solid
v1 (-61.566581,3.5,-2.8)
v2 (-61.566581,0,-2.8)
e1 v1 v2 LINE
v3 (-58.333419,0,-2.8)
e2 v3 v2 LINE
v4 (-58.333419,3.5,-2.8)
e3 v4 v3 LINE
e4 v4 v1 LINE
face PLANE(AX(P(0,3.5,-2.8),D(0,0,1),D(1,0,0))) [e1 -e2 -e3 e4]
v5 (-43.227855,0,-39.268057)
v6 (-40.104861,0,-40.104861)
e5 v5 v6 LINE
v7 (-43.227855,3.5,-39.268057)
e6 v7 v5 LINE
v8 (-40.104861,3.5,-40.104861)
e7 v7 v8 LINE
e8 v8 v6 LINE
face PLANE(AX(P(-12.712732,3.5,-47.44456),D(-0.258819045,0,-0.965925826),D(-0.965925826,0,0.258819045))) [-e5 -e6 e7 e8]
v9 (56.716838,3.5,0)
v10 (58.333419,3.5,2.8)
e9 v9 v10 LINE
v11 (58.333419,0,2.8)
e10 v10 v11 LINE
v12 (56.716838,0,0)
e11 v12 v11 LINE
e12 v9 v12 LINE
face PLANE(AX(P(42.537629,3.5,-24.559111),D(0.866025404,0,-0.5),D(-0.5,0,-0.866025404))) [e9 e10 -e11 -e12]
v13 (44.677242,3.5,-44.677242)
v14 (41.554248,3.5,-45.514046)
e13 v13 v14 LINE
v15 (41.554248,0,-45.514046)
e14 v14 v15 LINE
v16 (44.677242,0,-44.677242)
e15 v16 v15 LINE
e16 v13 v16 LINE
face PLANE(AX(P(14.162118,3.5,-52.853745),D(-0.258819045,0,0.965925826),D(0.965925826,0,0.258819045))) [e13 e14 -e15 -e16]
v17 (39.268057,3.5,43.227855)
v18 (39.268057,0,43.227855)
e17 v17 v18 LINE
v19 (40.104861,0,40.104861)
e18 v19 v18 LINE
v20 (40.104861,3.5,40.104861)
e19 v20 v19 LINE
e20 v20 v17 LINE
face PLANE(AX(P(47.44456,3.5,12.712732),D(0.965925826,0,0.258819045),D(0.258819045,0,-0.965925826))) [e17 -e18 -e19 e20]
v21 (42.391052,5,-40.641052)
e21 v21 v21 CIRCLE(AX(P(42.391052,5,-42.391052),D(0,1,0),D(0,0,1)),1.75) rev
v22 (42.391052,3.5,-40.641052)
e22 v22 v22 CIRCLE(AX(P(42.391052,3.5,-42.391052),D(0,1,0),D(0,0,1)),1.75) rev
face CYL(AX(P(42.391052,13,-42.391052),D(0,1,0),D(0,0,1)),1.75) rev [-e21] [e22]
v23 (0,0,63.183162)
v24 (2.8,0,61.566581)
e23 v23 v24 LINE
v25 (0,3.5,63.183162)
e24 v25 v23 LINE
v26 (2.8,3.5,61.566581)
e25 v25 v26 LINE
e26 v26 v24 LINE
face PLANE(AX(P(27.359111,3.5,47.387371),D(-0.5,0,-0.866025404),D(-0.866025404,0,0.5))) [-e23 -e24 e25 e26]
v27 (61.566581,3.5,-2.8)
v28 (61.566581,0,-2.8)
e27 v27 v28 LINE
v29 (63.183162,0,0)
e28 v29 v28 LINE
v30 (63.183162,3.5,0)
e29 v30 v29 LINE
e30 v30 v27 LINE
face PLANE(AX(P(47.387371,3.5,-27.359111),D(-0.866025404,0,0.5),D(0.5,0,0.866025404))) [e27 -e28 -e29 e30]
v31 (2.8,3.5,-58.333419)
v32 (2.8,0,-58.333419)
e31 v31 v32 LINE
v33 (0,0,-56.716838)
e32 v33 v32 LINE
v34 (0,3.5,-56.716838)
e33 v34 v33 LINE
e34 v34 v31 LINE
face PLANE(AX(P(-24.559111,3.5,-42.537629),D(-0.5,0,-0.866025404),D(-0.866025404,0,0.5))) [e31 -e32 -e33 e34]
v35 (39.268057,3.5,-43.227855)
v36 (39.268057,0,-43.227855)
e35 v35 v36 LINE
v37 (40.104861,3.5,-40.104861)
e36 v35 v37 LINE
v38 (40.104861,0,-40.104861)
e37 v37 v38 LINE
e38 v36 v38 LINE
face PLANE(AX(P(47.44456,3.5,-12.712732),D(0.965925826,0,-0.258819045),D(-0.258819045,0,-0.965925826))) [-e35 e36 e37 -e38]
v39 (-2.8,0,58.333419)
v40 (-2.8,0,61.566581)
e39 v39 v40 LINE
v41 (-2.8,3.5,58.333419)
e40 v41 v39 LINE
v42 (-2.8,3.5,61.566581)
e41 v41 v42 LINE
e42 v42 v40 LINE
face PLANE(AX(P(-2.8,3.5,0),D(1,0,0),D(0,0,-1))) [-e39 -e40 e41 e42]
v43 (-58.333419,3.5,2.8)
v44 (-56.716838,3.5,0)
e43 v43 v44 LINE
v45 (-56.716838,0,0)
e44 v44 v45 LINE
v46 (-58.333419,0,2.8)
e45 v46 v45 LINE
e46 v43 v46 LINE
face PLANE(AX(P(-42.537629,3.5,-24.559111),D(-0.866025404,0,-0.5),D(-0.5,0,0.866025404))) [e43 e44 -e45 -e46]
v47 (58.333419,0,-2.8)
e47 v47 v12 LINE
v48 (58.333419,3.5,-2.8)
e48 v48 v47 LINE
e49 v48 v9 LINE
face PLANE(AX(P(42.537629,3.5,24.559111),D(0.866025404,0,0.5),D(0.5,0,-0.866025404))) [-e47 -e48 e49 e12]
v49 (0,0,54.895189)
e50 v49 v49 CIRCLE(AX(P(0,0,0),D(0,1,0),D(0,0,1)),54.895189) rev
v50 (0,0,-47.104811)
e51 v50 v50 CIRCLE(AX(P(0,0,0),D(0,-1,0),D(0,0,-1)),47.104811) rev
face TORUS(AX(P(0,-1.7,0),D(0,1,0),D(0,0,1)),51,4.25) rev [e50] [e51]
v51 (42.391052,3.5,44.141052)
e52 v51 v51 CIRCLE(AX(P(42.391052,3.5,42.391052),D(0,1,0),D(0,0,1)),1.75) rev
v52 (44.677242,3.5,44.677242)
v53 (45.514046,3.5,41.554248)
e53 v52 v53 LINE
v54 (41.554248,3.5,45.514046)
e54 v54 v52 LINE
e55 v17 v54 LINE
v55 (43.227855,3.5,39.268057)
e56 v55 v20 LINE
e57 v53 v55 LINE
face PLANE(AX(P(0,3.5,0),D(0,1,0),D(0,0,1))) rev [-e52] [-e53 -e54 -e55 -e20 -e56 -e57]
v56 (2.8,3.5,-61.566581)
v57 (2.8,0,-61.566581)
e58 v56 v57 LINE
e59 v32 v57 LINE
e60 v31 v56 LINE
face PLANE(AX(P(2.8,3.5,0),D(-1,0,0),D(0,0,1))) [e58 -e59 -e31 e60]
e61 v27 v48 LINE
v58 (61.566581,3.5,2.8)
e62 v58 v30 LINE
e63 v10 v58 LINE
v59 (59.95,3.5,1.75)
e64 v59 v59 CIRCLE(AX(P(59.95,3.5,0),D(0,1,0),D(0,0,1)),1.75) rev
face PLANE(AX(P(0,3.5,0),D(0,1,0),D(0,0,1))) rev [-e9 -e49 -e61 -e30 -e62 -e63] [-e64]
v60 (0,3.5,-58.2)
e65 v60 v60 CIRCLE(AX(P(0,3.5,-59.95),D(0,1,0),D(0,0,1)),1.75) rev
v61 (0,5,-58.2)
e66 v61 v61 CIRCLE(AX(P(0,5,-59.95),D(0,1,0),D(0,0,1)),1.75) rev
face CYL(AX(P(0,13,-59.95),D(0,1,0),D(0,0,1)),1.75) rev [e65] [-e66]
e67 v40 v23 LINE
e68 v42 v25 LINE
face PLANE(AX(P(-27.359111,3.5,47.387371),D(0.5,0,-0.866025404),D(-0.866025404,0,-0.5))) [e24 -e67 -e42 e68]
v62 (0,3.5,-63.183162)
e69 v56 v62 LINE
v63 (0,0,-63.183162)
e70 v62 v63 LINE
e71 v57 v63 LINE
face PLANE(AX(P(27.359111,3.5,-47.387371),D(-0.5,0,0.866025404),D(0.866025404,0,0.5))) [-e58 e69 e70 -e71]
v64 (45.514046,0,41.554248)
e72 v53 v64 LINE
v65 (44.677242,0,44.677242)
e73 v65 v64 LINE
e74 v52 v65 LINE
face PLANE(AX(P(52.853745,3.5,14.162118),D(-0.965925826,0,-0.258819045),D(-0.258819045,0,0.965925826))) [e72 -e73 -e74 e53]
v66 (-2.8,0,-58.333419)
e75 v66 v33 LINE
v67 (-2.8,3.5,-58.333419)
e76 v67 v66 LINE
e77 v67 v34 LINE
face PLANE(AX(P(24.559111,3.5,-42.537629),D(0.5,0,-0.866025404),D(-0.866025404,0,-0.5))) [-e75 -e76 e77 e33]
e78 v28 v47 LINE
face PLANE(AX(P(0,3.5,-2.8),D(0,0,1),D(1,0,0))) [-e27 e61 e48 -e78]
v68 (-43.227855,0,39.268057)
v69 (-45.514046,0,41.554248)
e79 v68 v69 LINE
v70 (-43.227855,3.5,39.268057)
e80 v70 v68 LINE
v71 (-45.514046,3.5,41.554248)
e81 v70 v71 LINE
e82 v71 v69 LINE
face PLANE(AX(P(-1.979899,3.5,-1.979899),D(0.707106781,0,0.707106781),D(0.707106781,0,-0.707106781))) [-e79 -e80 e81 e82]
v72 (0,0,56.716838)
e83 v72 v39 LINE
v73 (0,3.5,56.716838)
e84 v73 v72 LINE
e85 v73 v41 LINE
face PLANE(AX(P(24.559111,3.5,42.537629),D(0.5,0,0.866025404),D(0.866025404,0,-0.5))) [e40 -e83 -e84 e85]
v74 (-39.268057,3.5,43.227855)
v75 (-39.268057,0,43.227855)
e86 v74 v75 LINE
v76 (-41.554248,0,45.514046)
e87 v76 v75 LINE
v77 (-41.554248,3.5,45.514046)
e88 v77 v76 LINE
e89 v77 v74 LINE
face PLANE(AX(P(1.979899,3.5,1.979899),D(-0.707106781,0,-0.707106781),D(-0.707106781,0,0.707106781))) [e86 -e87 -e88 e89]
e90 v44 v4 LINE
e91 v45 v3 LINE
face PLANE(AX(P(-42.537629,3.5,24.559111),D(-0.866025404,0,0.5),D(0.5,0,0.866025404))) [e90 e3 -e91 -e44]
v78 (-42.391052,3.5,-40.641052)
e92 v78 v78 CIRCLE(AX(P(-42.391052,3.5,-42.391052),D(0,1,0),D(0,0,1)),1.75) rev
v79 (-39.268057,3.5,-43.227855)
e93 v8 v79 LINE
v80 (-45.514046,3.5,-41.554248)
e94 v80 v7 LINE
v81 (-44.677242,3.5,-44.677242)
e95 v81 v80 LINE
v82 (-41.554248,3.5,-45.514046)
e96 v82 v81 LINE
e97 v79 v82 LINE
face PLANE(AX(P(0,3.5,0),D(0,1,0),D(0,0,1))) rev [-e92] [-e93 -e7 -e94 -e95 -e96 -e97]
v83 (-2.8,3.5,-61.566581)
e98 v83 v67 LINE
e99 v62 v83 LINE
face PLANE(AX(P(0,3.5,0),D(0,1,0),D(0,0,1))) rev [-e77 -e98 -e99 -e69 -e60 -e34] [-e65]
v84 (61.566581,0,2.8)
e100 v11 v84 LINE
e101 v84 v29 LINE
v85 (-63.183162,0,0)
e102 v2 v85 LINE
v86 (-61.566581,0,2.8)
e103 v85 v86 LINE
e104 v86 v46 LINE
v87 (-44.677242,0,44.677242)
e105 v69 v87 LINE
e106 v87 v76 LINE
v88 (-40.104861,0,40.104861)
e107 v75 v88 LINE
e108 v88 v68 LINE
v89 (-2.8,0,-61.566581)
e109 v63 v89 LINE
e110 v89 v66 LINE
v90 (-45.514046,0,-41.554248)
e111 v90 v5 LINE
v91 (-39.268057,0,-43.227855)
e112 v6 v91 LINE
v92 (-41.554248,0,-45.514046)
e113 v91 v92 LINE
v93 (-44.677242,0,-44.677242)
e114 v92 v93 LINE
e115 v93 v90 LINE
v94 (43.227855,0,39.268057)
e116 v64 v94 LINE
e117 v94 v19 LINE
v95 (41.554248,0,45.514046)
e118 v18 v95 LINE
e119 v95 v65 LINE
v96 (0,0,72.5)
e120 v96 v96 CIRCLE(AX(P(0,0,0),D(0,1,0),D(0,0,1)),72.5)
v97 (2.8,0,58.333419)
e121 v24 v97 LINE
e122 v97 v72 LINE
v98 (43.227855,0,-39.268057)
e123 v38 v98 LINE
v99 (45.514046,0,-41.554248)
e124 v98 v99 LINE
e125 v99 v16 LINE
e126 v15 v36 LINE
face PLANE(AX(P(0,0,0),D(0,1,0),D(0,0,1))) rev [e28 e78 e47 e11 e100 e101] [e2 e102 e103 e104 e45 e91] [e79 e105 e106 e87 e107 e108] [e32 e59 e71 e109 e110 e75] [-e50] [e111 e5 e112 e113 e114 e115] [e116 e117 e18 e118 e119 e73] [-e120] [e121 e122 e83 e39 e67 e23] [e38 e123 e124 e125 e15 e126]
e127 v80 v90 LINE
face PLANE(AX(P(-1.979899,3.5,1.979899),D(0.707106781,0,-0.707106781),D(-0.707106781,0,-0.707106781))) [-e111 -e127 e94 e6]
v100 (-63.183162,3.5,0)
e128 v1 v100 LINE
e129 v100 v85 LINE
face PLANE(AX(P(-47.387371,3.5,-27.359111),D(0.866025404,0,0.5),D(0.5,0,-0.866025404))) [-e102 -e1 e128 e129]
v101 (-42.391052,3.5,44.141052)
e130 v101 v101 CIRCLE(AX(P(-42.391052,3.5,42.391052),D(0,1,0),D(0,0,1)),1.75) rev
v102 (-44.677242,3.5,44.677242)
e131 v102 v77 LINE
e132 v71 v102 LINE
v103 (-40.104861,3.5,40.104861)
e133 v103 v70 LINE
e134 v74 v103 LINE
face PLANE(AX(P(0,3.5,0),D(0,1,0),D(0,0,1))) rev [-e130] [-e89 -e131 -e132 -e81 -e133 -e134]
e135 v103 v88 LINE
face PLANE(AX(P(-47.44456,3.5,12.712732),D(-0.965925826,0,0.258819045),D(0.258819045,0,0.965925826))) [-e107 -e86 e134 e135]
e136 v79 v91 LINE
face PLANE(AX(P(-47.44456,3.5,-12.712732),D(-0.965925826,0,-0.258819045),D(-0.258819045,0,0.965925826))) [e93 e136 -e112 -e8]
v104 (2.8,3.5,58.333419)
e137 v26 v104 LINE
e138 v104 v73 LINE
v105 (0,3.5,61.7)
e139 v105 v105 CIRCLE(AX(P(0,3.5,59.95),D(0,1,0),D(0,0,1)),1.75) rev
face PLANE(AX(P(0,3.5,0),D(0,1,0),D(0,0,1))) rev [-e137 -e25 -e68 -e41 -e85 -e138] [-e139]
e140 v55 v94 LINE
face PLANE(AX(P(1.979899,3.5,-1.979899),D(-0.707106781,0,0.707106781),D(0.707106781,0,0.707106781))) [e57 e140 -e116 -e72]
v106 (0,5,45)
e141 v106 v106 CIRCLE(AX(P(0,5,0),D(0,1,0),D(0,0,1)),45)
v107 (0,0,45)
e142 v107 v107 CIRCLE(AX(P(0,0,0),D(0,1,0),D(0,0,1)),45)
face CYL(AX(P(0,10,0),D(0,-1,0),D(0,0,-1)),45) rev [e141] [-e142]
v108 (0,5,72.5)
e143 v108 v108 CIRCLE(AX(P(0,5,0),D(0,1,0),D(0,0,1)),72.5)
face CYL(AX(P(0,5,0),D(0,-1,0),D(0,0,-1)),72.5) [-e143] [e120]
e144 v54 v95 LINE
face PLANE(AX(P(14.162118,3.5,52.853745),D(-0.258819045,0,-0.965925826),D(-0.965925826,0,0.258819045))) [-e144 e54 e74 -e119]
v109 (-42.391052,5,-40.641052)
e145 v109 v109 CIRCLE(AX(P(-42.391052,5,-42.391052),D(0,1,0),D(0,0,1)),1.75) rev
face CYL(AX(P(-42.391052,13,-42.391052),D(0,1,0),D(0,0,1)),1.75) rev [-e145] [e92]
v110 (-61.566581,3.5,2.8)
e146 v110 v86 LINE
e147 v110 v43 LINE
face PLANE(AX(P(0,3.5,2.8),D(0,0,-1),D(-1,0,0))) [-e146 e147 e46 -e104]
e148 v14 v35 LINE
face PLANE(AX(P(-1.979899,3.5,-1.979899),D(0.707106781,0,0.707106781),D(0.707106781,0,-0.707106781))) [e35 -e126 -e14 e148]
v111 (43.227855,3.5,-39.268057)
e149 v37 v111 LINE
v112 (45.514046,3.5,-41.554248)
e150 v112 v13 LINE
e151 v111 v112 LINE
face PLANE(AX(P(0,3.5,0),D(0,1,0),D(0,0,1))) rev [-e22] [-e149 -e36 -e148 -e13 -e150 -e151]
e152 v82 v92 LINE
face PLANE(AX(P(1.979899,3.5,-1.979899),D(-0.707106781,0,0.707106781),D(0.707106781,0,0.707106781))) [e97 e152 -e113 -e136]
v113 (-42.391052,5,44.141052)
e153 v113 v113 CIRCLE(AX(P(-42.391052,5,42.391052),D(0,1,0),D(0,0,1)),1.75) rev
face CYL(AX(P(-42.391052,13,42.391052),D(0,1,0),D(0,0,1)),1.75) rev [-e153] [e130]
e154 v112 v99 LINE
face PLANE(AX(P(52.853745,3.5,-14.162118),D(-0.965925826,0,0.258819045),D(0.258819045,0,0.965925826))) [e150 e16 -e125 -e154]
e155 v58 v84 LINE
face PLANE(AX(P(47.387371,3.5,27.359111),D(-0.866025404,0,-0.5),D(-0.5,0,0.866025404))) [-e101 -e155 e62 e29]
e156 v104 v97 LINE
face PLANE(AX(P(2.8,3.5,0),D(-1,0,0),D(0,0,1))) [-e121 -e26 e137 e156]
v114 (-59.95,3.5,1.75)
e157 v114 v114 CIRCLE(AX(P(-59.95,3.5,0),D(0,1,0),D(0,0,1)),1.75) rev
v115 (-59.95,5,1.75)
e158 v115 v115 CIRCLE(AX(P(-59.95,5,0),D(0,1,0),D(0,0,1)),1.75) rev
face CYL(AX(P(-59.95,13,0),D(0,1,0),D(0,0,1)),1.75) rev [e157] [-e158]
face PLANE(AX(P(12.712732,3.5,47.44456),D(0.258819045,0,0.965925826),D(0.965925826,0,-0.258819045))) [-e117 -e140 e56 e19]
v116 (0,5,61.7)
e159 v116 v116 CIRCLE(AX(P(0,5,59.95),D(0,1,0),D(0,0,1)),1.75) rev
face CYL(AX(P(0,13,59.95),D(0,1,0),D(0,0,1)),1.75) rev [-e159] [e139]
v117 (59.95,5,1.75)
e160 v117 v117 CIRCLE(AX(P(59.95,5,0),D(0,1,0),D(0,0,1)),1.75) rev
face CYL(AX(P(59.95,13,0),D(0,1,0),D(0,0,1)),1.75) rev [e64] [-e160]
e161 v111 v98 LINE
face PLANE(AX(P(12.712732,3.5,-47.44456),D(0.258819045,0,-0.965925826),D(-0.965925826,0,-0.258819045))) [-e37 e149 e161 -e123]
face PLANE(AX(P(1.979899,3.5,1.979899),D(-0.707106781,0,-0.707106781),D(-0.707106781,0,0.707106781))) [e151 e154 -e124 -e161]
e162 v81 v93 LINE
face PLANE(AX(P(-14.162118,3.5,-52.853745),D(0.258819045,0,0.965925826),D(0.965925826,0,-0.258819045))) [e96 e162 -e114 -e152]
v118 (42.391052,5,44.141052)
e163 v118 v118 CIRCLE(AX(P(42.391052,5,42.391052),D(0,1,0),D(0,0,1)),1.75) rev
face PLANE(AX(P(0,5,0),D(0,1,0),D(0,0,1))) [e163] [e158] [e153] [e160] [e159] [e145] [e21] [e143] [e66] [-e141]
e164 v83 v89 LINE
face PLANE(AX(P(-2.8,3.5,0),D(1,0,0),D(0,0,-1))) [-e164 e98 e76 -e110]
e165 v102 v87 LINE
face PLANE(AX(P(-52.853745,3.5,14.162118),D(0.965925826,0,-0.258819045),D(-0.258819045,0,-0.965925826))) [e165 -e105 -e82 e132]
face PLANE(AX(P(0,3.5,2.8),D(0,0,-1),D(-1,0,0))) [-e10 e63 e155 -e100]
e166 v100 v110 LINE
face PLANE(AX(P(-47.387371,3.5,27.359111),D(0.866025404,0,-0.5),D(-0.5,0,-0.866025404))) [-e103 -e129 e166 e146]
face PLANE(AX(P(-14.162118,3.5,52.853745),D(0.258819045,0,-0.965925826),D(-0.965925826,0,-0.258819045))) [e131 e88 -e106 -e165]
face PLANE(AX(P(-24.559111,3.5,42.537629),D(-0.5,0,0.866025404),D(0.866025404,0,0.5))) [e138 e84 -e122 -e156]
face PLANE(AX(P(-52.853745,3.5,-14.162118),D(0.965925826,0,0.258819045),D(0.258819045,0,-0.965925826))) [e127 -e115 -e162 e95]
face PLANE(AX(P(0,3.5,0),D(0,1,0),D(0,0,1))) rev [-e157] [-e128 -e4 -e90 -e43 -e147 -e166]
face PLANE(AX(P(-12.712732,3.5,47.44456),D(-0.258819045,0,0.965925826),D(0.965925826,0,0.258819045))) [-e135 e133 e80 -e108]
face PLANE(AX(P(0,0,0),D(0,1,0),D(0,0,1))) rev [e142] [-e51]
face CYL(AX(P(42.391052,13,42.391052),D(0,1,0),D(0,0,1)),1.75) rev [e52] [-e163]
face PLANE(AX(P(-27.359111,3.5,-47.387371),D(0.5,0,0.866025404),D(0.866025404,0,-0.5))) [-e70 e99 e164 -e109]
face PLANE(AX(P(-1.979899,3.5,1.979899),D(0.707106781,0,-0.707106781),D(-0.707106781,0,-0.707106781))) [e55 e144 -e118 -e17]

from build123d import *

# Parameters (mm, degrees)
SZKIC1_R                         = 72.5
DODANIE_WYCI_GNI_CIE1_DEPTH      = 5
DODANIE_WYCI_GNI_CIE2_START      = 5
SZKIC1_3_R                       = 65
SZKIC1_3_R_2                     = 54.5
DODANIE_WYCI_GNI_CIE2_DEPTH      = 8
DODANIE_WYCI_GNI_CIE3_START      = 13
SZKIC1_4_R                       = 54.5
DODANIE_WYCI_GNI_CIE3_DEPTH      = 30
DODANIE_WYCI_GNI_CIE4_START      = 43
SZKIC2_W                         = 34
SZKIC2_H                         = 88
DODANIE_WYCI_GNI_CIE4_DEPTH      = 93
SZKIC3_R                         = 45
WYTNIJ_WYCI_GNI_CIE1_DEPTH       = 10
DODANIE_WYCI_GNI_CIE5_START      = 10
SZKIC4_R                         = 3
DODANIE_WYCI_GNI_CIE5_DEPTH      = 13
ZAAWANSOWANYOTW_R1_OUTLINE_R     = 1.75
ZAAWANSOWANYOTW_R1_DEPTH         = 13
ZAAWANSOWANYOTW_R1_START         = 10
ZAAWANSOWANYOTW_R1_2_OUTLINE_R   = 3
ZAAWANSOWANYOTW_R1_2_OUTLINE_R_2 = 1.75
ZAAWANSOWANYOTW_R1_2_DEPTH       = 3
SZKIC7_R                         = 4.25
WYTNIJ_WYCI_GNI_CIE2_START       = -13
WYTNIJ_WYCI_GNI_CIE2_DEPTH       = 3.5
PRZECI_CIE1_START                = 5
PRZECI_CIE1_OUTLINE_R            = 1.75
PRZECI_CIE1_DEPTH                = 131
PRZECI_CIE1_START_2              = -3
PRZECI_CIE1_2_OUTLINE_R          = 3
PRZECI_CIE1_2_DEPTH              = 8


# Read off the part's stored shape, not the designer's step: ZaawansowanyOtwór1, Przecięcie1
with BuildPart() as part:
    # Szkic1 → Dodanie-wyciągnięcie1 (new body)
    with BuildSketch(Plane(origin=(0, 0, 0), x_dir=(1, 0, 0), z_dir=(0, 1, 0))):
        with Locations(Location((0, 0, 0), (0, 0, 270))):
            Circle(SZKIC1_R)
    extrude(amount=DODANIE_WYCI_GNI_CIE1_DEPTH)

    # Szkic1<3> → Dodanie-wyciągnięcie2 (add)
    with BuildSketch(Plane(origin=(0, 0, 0), x_dir=(1, 0, 0), z_dir=(0, 1, 0)).offset(DODANIE_WYCI_GNI_CIE2_START)):
        with Locations(Location((0, 0, 0), (0, 0, 270))):
            Circle(SZKIC1_3_R)
        Circle(SZKIC1_3_R_2)
    extrude(amount=DODANIE_WYCI_GNI_CIE2_DEPTH)

    # Szkic1<4> → Dodanie-wyciągnięcie3 (add)
    with BuildSketch(Plane(origin=(0, 0, 0), x_dir=(1, 0, 0), z_dir=(0, 1, 0)).offset(DODANIE_WYCI_GNI_CIE3_START)):
        with Locations(Location((0, 0, 0), (0, 0, 270))):
            Circle(SZKIC1_4_R)
    extrude(amount=DODANIE_WYCI_GNI_CIE3_DEPTH)

    # Szkic2 → Dodanie-wyciągnięcie4 (add)
    with BuildSketch(Plane(origin=(0, 0, 0), x_dir=(1, 0, 0), z_dir=(0, 1, 0)).offset(DODANIE_WYCI_GNI_CIE4_START)):
        with Locations((-44.5, -12.5)):
            Rectangle(SZKIC2_W, SZKIC2_H)
        with Locations((44.5, -12.5)):
            Rectangle(SZKIC2_W, SZKIC2_H)
    extrude(amount=DODANIE_WYCI_GNI_CIE4_DEPTH)

    # Szkic3 → Wytnij-wyciągnięcie1 (cut)
    with BuildSketch(Plane(origin=(0, 0, 0), x_dir=(1, 0, 0), z_dir=(0, 1, 0))):
        with Locations(Location((0, 0, 0), (0, 0, 270))):
            Circle(SZKIC3_R)
    extrude(amount=WYTNIJ_WYCI_GNI_CIE1_DEPTH, mode=Mode.SUBTRACT)

    # Szkic4 → Dodanie-wyciągnięcie5 (add)
    with BuildSketch(Plane(origin=(0, 0, 0), x_dir=(1, 0, 0), z_dir=(0, 1, 0)).offset(DODANIE_WYCI_GNI_CIE5_START)):
        with Locations(Location((0, 0, 0), (0, 0, 270))):
            Circle(SZKIC4_R)
    extrude(amount=-DODANIE_WYCI_GNI_CIE5_DEPTH)

    # ZaawansowanyOtwór1 outline → ZaawansowanyOtwór1 (cut)
    with BuildSketch(Plane(origin=(0, 0, 0), x_dir=(1, 0, 0), z_dir=(0, 1, 0))):
        with Locations((-42.391051532, 42.391051532)):
            Circle(ZAAWANSOWANYOTW_R1_OUTLINE_R)
        with Locations((-59.95, 0)):
            Circle(ZAAWANSOWANYOTW_R1_OUTLINE_R)
        with Locations((-42.391051532, -42.391051532)):
            Circle(ZAAWANSOWANYOTW_R1_OUTLINE_R)
        with Locations((0, -59.95)):
            Circle(ZAAWANSOWANYOTW_R1_OUTLINE_R)
        with Locations((42.391051532, -42.391051532)):
            Circle(ZAAWANSOWANYOTW_R1_OUTLINE_R)
        with Locations((59.95, 0)):
            Circle(ZAAWANSOWANYOTW_R1_OUTLINE_R)
        with Locations((42.391051532, 42.391051532)):
            Circle(ZAAWANSOWANYOTW_R1_OUTLINE_R)
        with Locations((0, 59.95)):
            Circle(ZAAWANSOWANYOTW_R1_OUTLINE_R)
    extrude(amount=ZAAWANSOWANYOTW_R1_DEPTH, mode=Mode.SUBTRACT)

    # ZaawansowanyOtw_r1 2 outline → ZaawansowanyOtw_r1 2 (cut)
    # profile 1 of 8: a face of its own
    with BuildSketch(Plane(origin=(0, 0, 0), x_dir=(1, 0, 0), z_dir=(0, 1, 0)).offset(ZAAWANSOWANYOTW_R1_START)):
        with Locations((-42.391051532, 42.391051532)):
            Circle(ZAAWANSOWANYOTW_R1_2_OUTLINE_R)
        with Locations((-42.391051532, 42.391051532)):
            Circle(ZAAWANSOWANYOTW_R1_2_OUTLINE_R_2, mode=Mode.SUBTRACT)
    # profile 2 of 8: a face of its own
    with BuildSketch(Plane(origin=(0, 0, 0), x_dir=(1, 0, 0), z_dir=(0, 1, 0)).offset(ZAAWANSOWANYOTW_R1_START)):
        with Locations((-59.95, 0)):
            Circle(ZAAWANSOWANYOTW_R1_2_OUTLINE_R)
        with Locations((-59.95, 0)):
            Circle(ZAAWANSOWANYOTW_R1_2_OUTLINE_R_2, mode=Mode.SUBTRACT)
    # profile 3 of 8: a face of its own
    with BuildSketch(Plane(origin=(0, 0, 0), x_dir=(1, 0, 0), z_dir=(0, 1, 0)).offset(ZAAWANSOWANYOTW_R1_START)):
        with Locations((-42.391051532, -42.391051532)):
            Circle(ZAAWANSOWANYOTW_R1_2_OUTLINE_R)
        with Locations((-42.391051532, -42.391051532)):
            Circle(ZAAWANSOWANYOTW_R1_2_OUTLINE_R_2, mode=Mode.SUBTRACT)
    # profile 4 of 8: a face of its own
    with BuildSketch(Plane(origin=(0, 0, 0), x_dir=(1, 0, 0), z_dir=(0, 1, 0)).offset(ZAAWANSOWANYOTW_R1_START)):
        with Locations((0, -59.95)):
            Circle(ZAAWANSOWANYOTW_R1_2_OUTLINE_R)
        with Locations((0, -59.95)):
            Circle(ZAAWANSOWANYOTW_R1_2_OUTLINE_R_2, mode=Mode.SUBTRACT)
    # profile 5 of 8: a face of its own
    with BuildSketch(Plane(origin=(0, 0, 0), x_dir=(1, 0, 0), z_dir=(0, 1, 0)).offset(ZAAWANSOWANYOTW_R1_START)):
        with Locations((42.391051532, -42.391051532)):
            Circle(ZAAWANSOWANYOTW_R1_2_OUTLINE_R)
        with Locations((42.391051532, -42.391051532)):
            Circle(ZAAWANSOWANYOTW_R1_2_OUTLINE_R_2, mode=Mode.SUBTRACT)
    # profile 6 of 8: a face of its own
    with BuildSketch(Plane(origin=(0, 0, 0), x_dir=(1, 0, 0), z_dir=(0, 1, 0)).offset(ZAAWANSOWANYOTW_R1_START)):
        with Locations((59.95, 0)):
            Circle(ZAAWANSOWANYOTW_R1_2_OUTLINE_R)
        with Locations((59.95, 0)):
            Circle(ZAAWANSOWANYOTW_R1_2_OUTLINE_R_2, mode=Mode.SUBTRACT)
    # profile 7 of 8: a face of its own
    with BuildSketch(Plane(origin=(0, 0, 0), x_dir=(1, 0, 0), z_dir=(0, 1, 0)).offset(ZAAWANSOWANYOTW_R1_START)):
        with Locations((42.391051532, 42.391051532)):
            Circle(ZAAWANSOWANYOTW_R1_2_OUTLINE_R)
        with Locations((42.391051532, 42.391051532)):
            Circle(ZAAWANSOWANYOTW_R1_2_OUTLINE_R_2, mode=Mode.SUBTRACT)
    # profile 8 of 8: a face of its own
    with BuildSketch(Plane(origin=(0, 0, 0), x_dir=(1, 0, 0), z_dir=(0, 1, 0)).offset(ZAAWANSOWANYOTW_R1_START)):
        with Locations((0, 59.95)):
            Circle(ZAAWANSOWANYOTW_R1_2_OUTLINE_R)
        with Locations((0, 59.95)):
            Circle(ZAAWANSOWANYOTW_R1_2_OUTLINE_R_2, mode=Mode.SUBTRACT)
    extrude(amount=ZAAWANSOWANYOTW_R1_2_DEPTH, mode=Mode.SUBTRACT)

    # Szkic7 → Wycięcie-obrót1 (revolve, cut)
    with BuildSketch(Plane(origin=(0, 0, 0), x_dir=(0, 0, -1), z_dir=(1, 0, 0)), mode=Mode.PRIVATE) as wyci_cie_obr_t1_sk:
        with Locations((51, -1.7)):
            Circle(SZKIC7_R)
    revolve(wyci_cie_obr_t1_sk.sketch.rotate(Axis((0, 0, 0), (0, -1, 0)), 305.308707607), axis=Axis((0, 0, 0), (0, -1, 0)), mode=Mode.SUBTRACT)

    # Szkic5 → Wytnij-wyciągnięcie2 (cut)
    with BuildSketch(Plane(origin=(0, 13, 0), x_dir=(1, 0, 0), z_dir=(0, 1, 0)).offset(WYTNIJ_WYCI_GNI_CIE2_START)):
        Polygon((43.227855306, 39.268057332), (45.514045733, 41.554247758), (44.677241959, 44.677241959), (41.554247758, 45.514045733), (39.268057332, 43.227855306), (40.104861106, 40.104861106), align=None)
        Polygon((-2.8, 61.566580754), (-2.8, 58.333419246), (0, 56.716838493), (2.8, 58.333419246), (2.8, 61.566580754), (0, 63.183161507), align=None)
        Polygon((58.333419246, -2.8), (61.566580754, -2.8), (63.183161507, 0), (61.566580754, 2.8), (58.333419246, 2.8), (56.716838493, 0), align=None)
        Polygon((39.268057332, -43.227855306), (41.554247758, -45.514045733), (44.677241959, -44.677241959), (45.514045733, -41.554247758), (43.227855306, -39.268057332), (40.104861106, -40.104861106), align=None)
        Polygon((-2.8, -58.333419246), (-2.8, -61.566580754), (0, -63.183161507), (2.8, -61.566580754), (2.8, -58.333419246), (0, -56.716838493), align=None)
        Polygon((-43.227855306, -39.268057332), (-45.514045733, -41.554247758), (-44.677241959, -44.677241959), (-41.554247758, -45.514045733), (-39.268057332, -43.227855306), (-40.104861106, -40.104861106), align=None)
        Polygon((-58.333419246, 2.8), (-61.566580754, 2.8), (-63.183161507, 0), (-61.566580754, -2.8), (-58.333419246, -2.8), (-56.716838493, 0), align=None)
        Polygon((-39.268057332, 43.227855306), (-41.554247758, 45.514045733), (-44.677241959, 44.677241959), (-45.514045733, 41.554247758), (-43.227855306, 39.268057332), (-40.104861106, 40.104861106), align=None)
    extrude(amount=WYTNIJ_WYCI_GNI_CIE2_DEPTH, mode=Mode.SUBTRACT)

    # Przecięcie1 outline → Przecięcie1 (cut)
    with BuildSketch(Plane(origin=(0, 0, 0), x_dir=(1, 0, 0), z_dir=(0, 1, 0)).offset(PRZECI_CIE1_START)):
        with BuildLine():
            ThreePointArc((61.5, -21.041625412), (65, 0), (61.5, 21.041625413))
            Line((61.5, 21.041625413), (61.5, 31.5))
            Line((61.5, 31.5), (56.857277459, 31.5))
            ThreePointArc((56.857277459, 31.5), (0, 65), (-56.857277459, 31.5))
            Line((-56.857277459, 31.5), (-61.5, 31.5))
            Line((-61.5, 31.5), (-61.5, 21.041625412))
            ThreePointArc((-61.5, 21.041625412), (-65, 0), (-61.5, -21.041625412))
            Line((-61.5, -21.041625412), (-61.5, -56.5))
            Line((-61.5, -56.5), (-32.136427928, -56.5))
            ThreePointArc((-32.136427928, -56.5), (0, -65), (32.136427928, -56.5))
            Line((32.136427928, -56.5), (61.5, -56.5))
            Line((61.5, -56.5), (61.5, -21.041625412))
        make_face()
        with BuildLine():
            ThreePointArc((61.5, 0.81240384), (61.7, 0), (61.5, -0.81240384))
            Line((61.5, -0.81240384), (61.5, 0.81240384))
        make_face(mode=Mode.SUBTRACT)
        with Locations((0, -59.95)):
            Circle(PRZECI_CIE1_OUTLINE_R, mode=Mode.SUBTRACT)
        with Locations((42.391051532, 42.391051532)):
            Circle(PRZECI_CIE1_OUTLINE_R, mode=Mode.SUBTRACT)
        with Locations((-42.391051532, 42.391051532)):
            Circle(PRZECI_CIE1_OUTLINE_R, mode=Mode.SUBTRACT)
        with Locations((0, 59.95)):
            Circle(PRZECI_CIE1_OUTLINE_R, mode=Mode.SUBTRACT)
        with BuildLine():
            ThreePointArc((-61.5, -0.81240384), (-61.7, 0), (-61.5, 0.81240384))
            Line((-61.5, 0.81240384), (-61.5, -0.81240384))
        make_face(mode=Mode.SUBTRACT)
    extrude(amount=PRZECI_CIE1_DEPTH, mode=Mode.SUBTRACT)

    # Przeci_cie1 2 outline → Przeci_cie1 2 (cut)
    with BuildSketch(Plane(origin=(0, 0, 0), x_dir=(1, 0, 0), z_dir=(0, 1, 0)).offset(PRZECI_CIE1_START_2)):
        Circle(PRZECI_CIE1_2_OUTLINE_R)
    extrude(amount=PRZECI_CIE1_2_DEPTH, mode=Mode.SUBTRACT)


solid = part.part
